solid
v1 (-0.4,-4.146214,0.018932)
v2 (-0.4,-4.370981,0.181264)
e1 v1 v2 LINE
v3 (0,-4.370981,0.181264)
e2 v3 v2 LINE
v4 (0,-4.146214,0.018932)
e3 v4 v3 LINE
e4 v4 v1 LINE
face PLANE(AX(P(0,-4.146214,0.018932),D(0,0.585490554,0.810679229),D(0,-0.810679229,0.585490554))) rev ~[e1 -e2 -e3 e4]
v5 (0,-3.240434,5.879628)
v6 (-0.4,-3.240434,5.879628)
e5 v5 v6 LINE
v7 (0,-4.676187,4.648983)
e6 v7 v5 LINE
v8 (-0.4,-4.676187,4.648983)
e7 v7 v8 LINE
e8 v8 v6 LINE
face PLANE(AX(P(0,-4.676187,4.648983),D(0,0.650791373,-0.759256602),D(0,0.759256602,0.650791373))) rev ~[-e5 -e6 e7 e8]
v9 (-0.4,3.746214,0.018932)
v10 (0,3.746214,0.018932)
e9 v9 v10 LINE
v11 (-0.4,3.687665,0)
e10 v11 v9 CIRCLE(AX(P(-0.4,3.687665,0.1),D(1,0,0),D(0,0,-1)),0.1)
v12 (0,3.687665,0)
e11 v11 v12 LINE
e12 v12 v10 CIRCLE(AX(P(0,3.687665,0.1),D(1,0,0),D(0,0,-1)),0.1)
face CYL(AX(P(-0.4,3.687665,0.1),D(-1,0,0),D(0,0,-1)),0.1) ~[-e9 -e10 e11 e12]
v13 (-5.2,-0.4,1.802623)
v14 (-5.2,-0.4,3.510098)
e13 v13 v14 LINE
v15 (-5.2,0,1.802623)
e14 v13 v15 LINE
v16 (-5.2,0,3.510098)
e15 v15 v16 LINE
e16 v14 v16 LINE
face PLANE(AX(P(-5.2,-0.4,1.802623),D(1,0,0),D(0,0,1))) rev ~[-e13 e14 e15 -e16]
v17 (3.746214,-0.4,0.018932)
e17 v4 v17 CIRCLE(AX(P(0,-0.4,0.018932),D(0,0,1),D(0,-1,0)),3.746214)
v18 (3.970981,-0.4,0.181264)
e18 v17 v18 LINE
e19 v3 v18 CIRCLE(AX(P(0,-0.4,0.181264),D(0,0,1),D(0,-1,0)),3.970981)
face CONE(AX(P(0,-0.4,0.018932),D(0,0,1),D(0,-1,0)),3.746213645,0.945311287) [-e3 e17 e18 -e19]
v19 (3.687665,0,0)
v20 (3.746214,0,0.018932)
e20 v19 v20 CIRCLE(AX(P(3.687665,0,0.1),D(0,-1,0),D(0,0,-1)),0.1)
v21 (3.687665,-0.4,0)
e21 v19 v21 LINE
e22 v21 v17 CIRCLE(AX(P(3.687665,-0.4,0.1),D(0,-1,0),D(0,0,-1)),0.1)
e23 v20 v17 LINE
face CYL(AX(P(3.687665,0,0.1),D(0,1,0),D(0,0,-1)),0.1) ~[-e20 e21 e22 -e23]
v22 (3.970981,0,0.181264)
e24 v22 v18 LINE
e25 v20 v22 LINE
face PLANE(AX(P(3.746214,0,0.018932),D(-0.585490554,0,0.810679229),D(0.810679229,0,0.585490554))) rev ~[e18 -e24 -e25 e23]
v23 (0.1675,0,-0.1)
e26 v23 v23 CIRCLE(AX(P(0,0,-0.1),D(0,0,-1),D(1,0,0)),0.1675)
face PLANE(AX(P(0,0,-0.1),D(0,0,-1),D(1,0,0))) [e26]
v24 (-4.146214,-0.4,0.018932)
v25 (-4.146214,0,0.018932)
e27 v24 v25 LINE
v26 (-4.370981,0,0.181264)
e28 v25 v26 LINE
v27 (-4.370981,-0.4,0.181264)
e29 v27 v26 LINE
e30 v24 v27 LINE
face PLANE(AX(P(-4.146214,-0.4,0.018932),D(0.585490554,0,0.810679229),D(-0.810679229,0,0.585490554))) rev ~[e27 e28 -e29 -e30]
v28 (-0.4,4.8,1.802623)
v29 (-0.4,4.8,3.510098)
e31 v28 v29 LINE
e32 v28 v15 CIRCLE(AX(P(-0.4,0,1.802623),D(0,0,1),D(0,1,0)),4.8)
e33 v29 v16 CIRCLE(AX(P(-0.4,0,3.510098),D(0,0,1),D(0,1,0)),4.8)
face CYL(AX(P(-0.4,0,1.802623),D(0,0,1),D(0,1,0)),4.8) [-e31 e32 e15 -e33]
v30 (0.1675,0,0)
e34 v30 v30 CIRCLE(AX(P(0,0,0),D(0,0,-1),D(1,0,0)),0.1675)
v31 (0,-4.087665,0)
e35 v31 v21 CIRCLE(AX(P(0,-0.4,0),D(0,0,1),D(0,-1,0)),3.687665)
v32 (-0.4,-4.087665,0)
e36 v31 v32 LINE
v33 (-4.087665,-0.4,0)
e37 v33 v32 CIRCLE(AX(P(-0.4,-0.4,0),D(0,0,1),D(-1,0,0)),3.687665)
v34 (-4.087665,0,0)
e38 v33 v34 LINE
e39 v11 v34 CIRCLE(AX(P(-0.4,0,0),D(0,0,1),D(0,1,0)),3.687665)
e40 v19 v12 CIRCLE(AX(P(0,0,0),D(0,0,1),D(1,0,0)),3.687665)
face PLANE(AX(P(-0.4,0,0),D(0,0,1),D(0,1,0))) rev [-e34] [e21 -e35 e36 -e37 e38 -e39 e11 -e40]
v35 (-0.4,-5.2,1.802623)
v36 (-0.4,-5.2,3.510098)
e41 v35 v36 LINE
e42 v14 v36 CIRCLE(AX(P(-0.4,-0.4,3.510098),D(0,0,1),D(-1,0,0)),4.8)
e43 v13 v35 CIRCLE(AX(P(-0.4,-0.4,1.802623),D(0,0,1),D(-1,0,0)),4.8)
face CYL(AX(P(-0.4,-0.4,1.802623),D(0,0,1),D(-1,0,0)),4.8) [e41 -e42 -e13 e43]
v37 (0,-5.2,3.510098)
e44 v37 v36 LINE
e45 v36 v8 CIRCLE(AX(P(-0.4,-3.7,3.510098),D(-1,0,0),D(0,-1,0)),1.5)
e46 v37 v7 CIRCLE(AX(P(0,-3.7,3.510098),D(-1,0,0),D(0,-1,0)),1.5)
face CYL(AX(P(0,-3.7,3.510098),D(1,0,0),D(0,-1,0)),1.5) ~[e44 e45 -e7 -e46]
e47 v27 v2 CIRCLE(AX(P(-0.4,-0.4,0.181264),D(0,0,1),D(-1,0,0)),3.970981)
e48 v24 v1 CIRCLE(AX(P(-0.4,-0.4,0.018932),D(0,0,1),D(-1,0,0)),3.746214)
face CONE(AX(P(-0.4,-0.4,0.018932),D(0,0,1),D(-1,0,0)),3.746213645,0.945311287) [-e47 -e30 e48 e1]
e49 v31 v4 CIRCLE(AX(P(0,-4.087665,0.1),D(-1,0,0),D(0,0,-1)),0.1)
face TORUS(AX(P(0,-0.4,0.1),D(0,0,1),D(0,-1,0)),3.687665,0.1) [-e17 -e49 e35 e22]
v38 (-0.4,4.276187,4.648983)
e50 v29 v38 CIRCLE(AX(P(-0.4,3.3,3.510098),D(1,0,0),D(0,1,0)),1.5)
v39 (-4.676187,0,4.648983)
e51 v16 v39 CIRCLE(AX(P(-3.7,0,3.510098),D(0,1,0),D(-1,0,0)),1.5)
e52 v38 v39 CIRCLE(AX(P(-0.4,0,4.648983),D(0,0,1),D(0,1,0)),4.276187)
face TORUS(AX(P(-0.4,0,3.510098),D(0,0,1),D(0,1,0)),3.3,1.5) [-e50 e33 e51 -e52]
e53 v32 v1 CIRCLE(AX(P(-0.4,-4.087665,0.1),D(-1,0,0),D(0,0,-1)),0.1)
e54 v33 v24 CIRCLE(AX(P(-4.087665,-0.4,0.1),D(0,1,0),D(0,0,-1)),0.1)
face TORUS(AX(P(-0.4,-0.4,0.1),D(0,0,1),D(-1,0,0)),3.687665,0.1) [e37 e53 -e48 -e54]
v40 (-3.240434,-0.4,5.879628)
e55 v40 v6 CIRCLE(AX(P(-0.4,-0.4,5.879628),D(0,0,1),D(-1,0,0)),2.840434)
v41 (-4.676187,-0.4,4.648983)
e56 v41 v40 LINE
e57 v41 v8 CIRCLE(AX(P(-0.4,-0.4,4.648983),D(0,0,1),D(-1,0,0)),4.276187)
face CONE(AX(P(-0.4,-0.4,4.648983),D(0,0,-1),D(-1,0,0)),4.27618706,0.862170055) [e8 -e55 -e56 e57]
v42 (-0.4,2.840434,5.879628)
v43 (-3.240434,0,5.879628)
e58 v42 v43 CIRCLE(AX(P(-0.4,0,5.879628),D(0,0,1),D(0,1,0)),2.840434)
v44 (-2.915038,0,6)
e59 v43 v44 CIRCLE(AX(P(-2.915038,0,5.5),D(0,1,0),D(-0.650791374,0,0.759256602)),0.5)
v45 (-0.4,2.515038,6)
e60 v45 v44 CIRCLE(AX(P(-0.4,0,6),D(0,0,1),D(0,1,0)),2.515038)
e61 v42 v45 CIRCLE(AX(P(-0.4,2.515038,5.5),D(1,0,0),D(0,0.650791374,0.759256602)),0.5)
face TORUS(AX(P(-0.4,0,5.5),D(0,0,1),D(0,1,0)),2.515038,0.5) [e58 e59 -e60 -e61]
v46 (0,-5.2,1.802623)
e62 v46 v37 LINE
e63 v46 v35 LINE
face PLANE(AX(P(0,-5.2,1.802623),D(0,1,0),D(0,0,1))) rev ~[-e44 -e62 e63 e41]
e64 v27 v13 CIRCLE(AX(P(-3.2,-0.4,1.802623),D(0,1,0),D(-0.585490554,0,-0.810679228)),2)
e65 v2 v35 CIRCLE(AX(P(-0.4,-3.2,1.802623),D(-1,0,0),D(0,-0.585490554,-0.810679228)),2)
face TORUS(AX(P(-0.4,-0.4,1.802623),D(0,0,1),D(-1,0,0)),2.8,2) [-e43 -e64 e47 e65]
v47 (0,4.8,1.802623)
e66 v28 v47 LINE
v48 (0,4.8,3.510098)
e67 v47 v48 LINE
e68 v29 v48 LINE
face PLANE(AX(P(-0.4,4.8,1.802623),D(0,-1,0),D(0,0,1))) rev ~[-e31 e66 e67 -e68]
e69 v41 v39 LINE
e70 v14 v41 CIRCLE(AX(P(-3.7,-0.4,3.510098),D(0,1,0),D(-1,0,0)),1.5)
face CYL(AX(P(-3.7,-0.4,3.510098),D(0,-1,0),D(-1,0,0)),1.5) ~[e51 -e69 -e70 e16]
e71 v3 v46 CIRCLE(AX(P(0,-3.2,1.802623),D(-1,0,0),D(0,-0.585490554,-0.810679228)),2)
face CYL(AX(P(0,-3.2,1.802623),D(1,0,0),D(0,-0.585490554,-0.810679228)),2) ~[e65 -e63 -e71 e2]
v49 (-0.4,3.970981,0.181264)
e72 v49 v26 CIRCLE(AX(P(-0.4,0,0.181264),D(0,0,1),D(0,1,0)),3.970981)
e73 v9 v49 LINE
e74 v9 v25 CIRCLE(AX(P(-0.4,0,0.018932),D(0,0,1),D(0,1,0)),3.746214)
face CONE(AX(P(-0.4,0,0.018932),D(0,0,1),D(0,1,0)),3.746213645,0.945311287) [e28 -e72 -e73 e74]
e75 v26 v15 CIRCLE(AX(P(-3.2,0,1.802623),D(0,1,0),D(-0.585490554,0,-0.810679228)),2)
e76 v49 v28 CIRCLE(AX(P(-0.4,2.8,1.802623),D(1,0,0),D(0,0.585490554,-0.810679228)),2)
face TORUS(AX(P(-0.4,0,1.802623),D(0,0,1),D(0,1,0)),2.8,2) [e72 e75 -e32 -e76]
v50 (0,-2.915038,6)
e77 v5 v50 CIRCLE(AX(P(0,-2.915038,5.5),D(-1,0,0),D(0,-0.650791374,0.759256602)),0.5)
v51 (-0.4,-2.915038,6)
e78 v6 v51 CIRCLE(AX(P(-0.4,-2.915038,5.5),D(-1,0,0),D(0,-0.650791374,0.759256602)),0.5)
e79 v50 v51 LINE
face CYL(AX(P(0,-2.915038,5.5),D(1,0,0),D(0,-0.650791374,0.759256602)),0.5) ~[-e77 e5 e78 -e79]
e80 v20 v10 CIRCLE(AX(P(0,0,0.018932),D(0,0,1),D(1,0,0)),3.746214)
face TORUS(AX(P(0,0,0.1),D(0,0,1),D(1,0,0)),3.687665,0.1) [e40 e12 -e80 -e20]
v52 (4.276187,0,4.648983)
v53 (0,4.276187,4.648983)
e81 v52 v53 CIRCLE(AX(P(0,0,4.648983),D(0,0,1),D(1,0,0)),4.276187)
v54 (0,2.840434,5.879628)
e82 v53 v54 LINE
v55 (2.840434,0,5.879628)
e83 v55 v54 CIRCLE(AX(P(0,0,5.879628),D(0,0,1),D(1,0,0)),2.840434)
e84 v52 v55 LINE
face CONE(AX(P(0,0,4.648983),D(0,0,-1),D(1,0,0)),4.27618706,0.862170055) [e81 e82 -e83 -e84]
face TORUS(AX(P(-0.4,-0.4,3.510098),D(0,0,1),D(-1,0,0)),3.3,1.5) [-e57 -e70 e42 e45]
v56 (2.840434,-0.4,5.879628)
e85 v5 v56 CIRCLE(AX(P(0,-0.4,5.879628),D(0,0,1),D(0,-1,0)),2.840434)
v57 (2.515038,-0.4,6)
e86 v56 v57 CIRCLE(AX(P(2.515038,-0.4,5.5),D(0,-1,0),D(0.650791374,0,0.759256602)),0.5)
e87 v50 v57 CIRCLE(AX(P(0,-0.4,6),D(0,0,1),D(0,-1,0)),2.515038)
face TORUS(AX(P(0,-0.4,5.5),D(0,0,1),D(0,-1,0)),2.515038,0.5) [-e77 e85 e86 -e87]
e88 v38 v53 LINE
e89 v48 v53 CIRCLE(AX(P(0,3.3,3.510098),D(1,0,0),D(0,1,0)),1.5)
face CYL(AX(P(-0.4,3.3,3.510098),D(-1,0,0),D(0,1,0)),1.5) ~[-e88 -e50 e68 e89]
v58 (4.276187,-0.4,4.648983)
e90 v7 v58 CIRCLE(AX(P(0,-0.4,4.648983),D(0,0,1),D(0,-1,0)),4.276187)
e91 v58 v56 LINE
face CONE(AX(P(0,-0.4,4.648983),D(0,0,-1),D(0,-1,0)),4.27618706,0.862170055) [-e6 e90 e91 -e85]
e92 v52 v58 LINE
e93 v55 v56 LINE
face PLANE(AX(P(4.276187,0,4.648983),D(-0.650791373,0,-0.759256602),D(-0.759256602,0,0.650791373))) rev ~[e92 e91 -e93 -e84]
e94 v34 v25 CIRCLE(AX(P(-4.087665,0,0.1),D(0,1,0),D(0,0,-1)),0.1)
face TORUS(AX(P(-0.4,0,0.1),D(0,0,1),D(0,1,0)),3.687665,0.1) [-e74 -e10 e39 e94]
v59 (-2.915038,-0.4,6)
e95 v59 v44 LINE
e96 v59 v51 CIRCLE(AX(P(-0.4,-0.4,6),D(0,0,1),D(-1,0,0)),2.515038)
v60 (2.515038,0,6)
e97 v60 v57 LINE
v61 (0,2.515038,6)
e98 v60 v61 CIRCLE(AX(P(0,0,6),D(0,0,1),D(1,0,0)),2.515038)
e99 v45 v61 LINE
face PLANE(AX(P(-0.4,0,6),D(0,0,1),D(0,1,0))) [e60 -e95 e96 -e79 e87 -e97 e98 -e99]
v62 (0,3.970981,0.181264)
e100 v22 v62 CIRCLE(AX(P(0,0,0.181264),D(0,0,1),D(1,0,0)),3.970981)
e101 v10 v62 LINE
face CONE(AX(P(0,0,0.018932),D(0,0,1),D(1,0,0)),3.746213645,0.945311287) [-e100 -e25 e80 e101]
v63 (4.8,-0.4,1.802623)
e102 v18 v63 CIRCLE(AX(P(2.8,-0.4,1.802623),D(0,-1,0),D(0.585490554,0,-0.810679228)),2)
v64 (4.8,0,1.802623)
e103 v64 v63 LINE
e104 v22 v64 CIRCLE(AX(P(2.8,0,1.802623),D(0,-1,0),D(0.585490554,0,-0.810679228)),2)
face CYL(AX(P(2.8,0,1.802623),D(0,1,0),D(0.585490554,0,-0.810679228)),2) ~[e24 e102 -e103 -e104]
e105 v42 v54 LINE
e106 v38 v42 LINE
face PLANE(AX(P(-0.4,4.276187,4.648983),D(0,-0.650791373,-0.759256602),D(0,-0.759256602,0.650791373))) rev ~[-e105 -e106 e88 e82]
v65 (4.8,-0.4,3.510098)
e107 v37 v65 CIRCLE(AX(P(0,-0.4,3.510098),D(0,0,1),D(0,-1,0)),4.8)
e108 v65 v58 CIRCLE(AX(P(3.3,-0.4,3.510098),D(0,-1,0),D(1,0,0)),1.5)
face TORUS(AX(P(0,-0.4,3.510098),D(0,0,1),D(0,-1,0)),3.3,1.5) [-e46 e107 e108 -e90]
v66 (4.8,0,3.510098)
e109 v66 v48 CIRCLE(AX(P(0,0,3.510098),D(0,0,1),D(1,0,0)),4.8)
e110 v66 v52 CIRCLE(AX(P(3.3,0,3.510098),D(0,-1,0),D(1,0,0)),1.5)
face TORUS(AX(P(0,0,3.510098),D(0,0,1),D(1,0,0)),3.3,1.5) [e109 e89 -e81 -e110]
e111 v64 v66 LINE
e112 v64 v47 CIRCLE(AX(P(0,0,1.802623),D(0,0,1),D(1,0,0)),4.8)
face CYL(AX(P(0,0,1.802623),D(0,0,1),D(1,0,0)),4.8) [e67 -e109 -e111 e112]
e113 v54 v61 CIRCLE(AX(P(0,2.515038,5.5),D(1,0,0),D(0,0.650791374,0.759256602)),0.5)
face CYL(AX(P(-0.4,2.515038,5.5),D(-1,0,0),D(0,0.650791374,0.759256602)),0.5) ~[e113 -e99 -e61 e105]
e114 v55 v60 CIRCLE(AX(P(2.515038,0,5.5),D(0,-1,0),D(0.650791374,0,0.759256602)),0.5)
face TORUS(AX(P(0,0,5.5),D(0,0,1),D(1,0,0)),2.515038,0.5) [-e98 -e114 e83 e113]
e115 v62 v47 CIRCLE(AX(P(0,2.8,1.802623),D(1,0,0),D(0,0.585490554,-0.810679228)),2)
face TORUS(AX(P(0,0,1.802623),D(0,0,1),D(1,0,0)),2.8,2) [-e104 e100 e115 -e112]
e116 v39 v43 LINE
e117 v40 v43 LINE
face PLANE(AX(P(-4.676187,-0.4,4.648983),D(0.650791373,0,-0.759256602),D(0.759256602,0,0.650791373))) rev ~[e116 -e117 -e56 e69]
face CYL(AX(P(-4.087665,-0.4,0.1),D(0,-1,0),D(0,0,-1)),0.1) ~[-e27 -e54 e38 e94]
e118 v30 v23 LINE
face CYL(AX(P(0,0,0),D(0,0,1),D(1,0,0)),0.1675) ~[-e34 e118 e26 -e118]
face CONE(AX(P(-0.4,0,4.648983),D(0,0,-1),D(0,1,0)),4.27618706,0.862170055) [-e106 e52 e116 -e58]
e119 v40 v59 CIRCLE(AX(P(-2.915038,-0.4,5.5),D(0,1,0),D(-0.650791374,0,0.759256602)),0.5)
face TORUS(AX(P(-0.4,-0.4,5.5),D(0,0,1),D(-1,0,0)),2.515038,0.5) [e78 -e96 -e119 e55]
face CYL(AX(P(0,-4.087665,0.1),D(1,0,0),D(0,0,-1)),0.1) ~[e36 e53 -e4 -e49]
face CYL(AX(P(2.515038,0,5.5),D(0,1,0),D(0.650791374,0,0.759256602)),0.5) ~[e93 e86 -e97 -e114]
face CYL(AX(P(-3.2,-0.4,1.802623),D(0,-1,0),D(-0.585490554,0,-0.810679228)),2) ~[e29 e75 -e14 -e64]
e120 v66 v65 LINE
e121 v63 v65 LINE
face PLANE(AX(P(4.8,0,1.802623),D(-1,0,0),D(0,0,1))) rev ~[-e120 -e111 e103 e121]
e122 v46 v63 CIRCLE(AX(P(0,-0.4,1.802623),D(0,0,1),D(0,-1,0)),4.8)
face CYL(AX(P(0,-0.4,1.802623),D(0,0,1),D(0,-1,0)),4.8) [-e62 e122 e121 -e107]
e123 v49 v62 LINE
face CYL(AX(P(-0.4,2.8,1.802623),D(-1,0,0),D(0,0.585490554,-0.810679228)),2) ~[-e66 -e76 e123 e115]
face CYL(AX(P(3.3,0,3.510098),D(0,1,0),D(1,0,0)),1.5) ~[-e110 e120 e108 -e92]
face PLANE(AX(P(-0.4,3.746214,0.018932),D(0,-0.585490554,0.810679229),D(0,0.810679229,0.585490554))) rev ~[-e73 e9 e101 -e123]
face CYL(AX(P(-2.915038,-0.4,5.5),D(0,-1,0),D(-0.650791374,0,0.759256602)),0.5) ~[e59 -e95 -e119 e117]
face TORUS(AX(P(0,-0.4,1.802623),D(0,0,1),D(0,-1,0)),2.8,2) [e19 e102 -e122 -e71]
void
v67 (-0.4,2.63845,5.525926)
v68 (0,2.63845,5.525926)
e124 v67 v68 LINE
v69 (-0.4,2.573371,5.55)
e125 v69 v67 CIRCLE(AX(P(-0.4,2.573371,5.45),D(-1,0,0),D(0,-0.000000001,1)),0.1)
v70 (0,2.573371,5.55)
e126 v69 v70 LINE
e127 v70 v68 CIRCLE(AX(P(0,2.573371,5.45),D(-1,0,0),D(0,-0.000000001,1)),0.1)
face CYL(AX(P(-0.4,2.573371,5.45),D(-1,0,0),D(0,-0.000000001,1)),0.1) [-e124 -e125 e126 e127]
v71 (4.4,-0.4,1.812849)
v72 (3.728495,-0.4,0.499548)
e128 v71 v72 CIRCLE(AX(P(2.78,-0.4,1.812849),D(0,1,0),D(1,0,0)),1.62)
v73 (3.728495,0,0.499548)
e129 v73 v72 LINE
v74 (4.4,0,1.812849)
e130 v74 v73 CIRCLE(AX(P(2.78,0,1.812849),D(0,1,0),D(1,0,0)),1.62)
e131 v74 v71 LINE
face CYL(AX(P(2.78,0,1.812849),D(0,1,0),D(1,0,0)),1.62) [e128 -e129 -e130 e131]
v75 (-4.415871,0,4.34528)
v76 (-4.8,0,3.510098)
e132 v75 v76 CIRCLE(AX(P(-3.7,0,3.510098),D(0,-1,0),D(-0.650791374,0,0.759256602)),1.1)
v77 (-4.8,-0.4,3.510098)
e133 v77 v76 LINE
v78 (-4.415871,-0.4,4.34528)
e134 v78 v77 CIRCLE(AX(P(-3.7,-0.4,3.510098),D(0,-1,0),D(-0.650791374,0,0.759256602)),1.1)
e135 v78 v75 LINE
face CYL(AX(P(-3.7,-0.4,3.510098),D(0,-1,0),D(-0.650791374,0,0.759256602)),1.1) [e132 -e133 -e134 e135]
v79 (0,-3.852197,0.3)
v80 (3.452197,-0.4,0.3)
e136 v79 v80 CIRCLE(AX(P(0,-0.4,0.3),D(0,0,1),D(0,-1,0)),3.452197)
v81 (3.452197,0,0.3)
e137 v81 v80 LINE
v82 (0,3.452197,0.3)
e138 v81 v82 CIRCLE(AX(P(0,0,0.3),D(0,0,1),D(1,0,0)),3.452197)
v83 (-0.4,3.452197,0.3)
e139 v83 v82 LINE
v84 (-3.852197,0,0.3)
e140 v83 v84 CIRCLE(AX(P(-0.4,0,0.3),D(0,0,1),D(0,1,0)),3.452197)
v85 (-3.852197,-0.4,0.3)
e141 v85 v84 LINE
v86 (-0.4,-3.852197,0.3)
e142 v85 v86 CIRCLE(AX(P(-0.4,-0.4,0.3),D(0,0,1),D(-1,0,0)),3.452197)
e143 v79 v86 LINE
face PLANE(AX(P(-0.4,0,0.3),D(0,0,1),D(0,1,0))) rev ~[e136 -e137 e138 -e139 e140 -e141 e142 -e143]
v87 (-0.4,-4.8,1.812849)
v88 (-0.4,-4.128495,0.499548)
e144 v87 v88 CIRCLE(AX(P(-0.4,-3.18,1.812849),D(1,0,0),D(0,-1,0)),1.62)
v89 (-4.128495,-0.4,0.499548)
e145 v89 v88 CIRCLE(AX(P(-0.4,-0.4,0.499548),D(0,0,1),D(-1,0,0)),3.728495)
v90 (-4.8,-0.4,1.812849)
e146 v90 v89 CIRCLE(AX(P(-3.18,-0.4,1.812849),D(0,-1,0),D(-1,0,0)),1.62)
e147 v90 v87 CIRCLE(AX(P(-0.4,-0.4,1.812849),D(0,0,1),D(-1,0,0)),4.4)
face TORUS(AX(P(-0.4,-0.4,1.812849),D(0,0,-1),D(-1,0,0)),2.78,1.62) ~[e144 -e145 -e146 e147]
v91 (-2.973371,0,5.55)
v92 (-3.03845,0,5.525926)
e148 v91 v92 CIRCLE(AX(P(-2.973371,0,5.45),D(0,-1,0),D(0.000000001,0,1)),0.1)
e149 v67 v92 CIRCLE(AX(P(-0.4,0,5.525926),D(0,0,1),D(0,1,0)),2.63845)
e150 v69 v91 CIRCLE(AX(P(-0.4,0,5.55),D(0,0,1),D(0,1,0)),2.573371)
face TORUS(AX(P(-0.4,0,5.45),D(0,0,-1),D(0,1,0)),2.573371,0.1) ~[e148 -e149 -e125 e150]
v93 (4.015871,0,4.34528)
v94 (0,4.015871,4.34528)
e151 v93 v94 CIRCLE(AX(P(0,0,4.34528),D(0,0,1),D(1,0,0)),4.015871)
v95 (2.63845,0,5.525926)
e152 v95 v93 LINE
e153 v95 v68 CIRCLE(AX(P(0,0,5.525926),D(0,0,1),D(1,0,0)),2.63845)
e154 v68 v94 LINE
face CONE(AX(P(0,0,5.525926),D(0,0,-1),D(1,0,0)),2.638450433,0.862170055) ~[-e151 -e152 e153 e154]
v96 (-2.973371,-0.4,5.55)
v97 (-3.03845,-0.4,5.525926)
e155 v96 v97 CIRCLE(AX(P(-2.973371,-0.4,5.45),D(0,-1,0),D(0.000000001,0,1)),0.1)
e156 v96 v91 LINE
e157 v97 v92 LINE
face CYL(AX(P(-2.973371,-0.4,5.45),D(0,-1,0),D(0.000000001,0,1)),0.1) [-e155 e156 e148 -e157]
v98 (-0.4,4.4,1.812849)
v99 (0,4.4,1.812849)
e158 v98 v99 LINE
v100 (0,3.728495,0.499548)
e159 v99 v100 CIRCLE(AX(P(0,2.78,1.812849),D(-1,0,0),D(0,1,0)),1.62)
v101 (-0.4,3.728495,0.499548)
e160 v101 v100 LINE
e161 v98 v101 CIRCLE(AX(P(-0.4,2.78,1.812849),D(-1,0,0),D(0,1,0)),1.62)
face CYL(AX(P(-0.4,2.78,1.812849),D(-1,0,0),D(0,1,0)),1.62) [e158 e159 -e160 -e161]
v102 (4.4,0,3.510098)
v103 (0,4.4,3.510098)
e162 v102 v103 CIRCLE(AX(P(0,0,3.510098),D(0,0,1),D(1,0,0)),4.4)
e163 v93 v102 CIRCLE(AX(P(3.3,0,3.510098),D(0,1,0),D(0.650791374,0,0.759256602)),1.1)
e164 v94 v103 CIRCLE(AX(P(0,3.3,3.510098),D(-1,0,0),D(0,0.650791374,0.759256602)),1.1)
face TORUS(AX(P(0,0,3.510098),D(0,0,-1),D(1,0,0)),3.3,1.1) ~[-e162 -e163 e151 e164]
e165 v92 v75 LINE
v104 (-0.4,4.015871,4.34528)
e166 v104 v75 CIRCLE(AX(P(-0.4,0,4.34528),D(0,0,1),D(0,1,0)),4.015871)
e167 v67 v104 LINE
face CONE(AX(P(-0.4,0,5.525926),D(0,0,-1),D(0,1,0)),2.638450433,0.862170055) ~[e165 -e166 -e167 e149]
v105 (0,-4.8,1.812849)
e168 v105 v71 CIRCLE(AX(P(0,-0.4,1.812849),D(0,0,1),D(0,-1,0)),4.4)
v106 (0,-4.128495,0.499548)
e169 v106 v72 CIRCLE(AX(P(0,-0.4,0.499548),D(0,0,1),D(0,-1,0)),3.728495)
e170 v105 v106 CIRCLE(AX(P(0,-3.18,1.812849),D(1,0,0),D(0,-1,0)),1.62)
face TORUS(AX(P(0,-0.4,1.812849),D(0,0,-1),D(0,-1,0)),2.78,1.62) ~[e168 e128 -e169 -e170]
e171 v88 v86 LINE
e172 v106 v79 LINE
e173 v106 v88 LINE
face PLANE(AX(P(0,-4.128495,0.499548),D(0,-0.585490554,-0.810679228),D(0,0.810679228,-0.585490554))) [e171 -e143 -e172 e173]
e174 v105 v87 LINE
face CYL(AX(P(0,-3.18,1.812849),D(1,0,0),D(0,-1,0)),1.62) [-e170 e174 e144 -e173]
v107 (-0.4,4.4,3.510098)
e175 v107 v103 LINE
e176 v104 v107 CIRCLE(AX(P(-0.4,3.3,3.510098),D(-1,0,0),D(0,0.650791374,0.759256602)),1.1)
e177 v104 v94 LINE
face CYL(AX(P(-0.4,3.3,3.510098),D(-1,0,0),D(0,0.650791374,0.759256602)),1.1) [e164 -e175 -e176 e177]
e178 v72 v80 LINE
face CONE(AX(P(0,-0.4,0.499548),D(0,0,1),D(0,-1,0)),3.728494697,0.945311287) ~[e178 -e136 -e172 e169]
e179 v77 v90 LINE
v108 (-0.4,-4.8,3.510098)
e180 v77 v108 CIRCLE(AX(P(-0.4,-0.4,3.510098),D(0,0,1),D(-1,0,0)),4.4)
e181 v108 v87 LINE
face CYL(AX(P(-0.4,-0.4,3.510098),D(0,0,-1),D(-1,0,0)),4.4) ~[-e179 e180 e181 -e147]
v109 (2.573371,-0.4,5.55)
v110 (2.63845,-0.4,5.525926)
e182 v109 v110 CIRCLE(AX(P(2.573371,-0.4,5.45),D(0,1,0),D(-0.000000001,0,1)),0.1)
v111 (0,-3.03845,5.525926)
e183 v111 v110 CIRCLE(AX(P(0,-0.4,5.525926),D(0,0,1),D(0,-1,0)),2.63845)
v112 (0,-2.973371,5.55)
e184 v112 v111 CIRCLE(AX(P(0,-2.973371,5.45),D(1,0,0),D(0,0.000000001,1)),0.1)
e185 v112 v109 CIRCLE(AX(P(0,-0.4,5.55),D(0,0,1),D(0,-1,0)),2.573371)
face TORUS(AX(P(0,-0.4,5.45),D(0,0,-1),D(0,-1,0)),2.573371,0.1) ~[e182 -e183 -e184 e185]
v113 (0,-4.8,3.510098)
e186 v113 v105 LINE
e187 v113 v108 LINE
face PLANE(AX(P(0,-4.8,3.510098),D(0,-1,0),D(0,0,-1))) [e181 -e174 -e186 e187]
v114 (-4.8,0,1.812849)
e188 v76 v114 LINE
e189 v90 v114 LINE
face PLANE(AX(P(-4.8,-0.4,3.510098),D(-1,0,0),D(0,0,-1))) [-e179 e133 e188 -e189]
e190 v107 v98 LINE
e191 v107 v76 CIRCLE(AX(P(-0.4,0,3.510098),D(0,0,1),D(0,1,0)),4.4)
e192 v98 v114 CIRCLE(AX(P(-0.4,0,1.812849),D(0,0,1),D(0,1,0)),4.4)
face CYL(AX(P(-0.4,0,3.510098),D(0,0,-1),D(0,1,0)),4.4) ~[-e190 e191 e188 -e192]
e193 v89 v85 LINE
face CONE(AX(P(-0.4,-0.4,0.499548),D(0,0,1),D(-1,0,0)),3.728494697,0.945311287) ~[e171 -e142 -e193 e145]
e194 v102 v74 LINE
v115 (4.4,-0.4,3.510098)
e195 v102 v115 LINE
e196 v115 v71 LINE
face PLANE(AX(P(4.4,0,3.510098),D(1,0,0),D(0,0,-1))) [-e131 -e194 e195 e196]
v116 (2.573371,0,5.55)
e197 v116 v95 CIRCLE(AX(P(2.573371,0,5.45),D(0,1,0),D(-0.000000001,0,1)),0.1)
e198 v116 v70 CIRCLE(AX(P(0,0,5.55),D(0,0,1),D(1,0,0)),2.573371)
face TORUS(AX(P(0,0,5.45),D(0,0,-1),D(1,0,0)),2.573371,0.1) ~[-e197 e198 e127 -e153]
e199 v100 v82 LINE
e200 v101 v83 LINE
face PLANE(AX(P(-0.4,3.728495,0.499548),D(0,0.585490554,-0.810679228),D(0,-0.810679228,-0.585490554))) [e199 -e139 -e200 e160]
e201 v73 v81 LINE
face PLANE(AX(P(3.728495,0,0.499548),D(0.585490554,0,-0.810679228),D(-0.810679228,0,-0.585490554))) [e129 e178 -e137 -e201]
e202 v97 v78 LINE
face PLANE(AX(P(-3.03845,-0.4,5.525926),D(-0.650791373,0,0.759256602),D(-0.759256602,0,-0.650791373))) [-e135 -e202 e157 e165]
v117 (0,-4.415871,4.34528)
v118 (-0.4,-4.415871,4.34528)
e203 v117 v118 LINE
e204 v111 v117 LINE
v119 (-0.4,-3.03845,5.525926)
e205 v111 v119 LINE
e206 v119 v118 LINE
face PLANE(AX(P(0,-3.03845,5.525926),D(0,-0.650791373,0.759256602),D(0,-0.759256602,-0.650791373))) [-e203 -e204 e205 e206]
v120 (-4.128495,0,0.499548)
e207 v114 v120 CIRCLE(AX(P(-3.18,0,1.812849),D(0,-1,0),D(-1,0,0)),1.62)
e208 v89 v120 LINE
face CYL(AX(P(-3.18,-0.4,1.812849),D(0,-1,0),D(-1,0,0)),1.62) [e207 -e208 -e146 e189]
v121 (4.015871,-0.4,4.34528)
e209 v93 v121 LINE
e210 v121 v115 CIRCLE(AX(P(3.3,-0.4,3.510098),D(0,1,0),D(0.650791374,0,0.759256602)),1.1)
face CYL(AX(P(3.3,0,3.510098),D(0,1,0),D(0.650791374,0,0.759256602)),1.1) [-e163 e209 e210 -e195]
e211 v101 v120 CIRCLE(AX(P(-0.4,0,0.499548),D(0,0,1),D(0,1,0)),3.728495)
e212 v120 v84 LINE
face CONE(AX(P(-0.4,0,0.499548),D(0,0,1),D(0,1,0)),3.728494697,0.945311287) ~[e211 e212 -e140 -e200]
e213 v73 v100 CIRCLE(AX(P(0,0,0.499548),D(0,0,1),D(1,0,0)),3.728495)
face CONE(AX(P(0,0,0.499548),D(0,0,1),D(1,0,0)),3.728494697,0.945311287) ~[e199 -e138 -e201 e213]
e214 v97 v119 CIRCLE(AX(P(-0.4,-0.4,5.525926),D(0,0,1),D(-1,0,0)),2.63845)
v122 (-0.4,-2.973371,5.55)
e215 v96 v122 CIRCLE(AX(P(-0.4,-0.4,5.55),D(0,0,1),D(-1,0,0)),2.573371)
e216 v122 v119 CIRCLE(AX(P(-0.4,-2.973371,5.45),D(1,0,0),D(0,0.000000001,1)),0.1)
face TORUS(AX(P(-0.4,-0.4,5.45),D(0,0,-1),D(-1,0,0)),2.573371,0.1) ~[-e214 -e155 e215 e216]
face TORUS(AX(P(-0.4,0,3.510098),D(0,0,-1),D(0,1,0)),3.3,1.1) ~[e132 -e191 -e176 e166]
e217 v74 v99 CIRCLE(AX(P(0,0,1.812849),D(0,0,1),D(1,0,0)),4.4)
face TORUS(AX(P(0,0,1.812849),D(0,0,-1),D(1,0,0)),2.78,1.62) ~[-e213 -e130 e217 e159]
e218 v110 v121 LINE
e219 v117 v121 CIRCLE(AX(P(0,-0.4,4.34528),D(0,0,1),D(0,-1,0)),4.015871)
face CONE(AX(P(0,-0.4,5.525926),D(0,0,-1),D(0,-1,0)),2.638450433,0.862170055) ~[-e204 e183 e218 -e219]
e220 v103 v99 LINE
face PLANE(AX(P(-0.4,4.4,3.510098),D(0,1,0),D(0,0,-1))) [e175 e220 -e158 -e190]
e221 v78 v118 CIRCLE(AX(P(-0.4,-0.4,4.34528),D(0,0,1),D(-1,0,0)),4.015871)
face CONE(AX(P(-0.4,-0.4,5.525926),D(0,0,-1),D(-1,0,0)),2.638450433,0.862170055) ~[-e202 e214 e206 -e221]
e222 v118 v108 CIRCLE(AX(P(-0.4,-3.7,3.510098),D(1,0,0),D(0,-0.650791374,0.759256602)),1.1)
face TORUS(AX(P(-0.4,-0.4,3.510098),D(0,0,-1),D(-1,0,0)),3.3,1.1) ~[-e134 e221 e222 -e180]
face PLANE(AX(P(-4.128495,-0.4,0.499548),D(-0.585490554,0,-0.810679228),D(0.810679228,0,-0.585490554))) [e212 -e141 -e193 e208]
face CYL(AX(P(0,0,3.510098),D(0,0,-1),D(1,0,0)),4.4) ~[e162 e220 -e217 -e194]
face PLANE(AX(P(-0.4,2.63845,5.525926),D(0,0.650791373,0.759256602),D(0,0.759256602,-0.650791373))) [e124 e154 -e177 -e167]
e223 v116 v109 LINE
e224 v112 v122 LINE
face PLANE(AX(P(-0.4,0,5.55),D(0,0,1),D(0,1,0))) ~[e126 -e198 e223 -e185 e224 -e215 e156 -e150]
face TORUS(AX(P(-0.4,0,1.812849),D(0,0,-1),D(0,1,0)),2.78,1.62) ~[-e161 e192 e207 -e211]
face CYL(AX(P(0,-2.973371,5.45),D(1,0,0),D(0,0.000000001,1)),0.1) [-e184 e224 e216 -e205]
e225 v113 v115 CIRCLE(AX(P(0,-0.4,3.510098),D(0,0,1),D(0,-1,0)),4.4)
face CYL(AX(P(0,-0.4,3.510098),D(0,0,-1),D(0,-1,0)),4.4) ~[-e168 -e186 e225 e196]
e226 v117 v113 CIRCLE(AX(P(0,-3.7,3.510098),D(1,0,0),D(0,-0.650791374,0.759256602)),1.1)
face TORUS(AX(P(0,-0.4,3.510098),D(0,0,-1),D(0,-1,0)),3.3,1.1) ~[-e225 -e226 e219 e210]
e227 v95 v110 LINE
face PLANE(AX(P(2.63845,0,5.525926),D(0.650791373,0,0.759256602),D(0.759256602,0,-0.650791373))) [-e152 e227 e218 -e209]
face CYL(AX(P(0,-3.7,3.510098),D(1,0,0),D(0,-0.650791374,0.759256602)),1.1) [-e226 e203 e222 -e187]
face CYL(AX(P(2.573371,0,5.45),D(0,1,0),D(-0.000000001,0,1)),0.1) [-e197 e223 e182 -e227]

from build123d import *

# Parameters (mm, degrees)
F3_DEPTH  = 0.4
F4_DEPTH  = 0.65
F5_ANGLE  = 90
F9_ANGLE  = -90
F11_ANGLE = 180
F13_DEPTH = 0.6
F14_R     = 0.1675
F17_DEPTH = 0.1


# Not quite as in the source:
# - a feature of the source that left no trace in its solid (it failed there, or was rolled back) is left out


with BuildPart() as f3:
    # F2 (on Front) → F3 (new body)
    with BuildSketch(Plane.XZ):
        with BuildLine():
            Line((0, 0.3), (0, 0))
            Line((0, 0), (3.6876645899, 0))
            ThreePointArc((3.6876645899, 0), (3.7184315179, 0.004850664), (3.7462136453, 0.0189320772))
            Line((3.7462136453, 0.0189320772), (3.9709811077, 0.1812641333))
            ThreePointArc((3.9709811077, 0.1812641333), (4.5807248826, 0.8921178442), (4.8, 1.8026225901))
            Line((4.8, 1.8026225901), (4.8, 3.5100976163))
            ThreePointArc((4.8, 3.5100976163), (4.6627693477, 4.1368828306), (4.2761870602, 4.6489825198))
            Line((4.2761870602, 4.6489825198), (2.8404336486, 5.8796283012))
            ThreePointArc((2.8404336486, 5.8796283012), (2.6885110858, 5.9689425075), (2.5150379619, 6))
            Line((2.5150379619, 6), (0, 6))
            Line((0, 6), (0, 5.55))
            Line((0, 5.55), (2.5733712952, 5.55))
            ThreePointArc((2.5733712952, 5.55), (2.60806592, 5.5437885015), (2.6384504326, 5.5259256602))
            Line((2.6384504326, 5.5259256602), (4.0158705108, 4.3452798789))
            ThreePointArc((4.0158705108, 4.3452798789), (4.2993641883, 3.9697401068), (4.4, 3.5100976163))
            Line((4.4, 3.5100976163), (4.4, 1.812848816))
            ThreePointArc((4.4, 1.812848816), (4.2223871549, 1.0753399719), (3.7284946972, 0.499548466))
            Line((3.7284946972, 0.499548466), (3.4521968212, 0.3))
            Line((3.4521968212, 0.3), (0, 0.3))
        make_face()
    extrude(amount=F3_DEPTH)

    # F4 (add): a face of the model
    f4_faces = [f3.faces().sort_by_distance(p)[0] for p in [
        (0, -0.2, 5.775),
    ]]
    extrude(f4_faces, amount=F4_DEPTH)

    # F2 (on Front) → F5 (revolve)
    with BuildSketch(Plane.XZ):
        with BuildLine():
            Line((0, 0.3), (0, 0))
            Line((0, 0), (3.6876645899, 0))
            ThreePointArc((3.6876645899, 0), (3.7184315179, 0.004850664), (3.7462136453, 0.0189320772))
            Line((3.7462136453, 0.0189320772), (3.9709811077, 0.1812641333))
            ThreePointArc((3.9709811077, 0.1812641333), (4.5807248826, 0.8921178442), (4.8, 1.8026225901))
            Line((4.8, 1.8026225901), (4.8, 3.5100976163))
            ThreePointArc((4.8, 3.5100976163), (4.6627693477, 4.1368828306), (4.2761870602, 4.6489825198))
            Line((4.2761870602, 4.6489825198), (2.8404336486, 5.8796283012))
            ThreePointArc((2.8404336486, 5.8796283012), (2.6885110858, 5.9689425075), (2.5150379619, 6))
            Line((2.5150379619, 6), (0, 6))
            Line((0, 6), (0, 5.55))
            Line((0, 5.55), (2.5733712952, 5.55))
            ThreePointArc((2.5733712952, 5.55), (2.60806592, 5.5437885015), (2.6384504326, 5.5259256602))
            Line((2.6384504326, 5.5259256602), (4.0158705108, 4.3452798789))
            ThreePointArc((4.0158705108, 4.3452798789), (4.2993641883, 3.9697401068), (4.4, 3.5100976163))
            Line((4.4, 3.5100976163), (4.4, 1.812848816))
            ThreePointArc((4.4, 1.812848816), (4.2223871549, 1.0753399719), (3.7284946972, 0.499548466))
            Line((3.7284946972, 0.499548466), (3.4521968212, 0.3))
            Line((3.4521968212, 0.3), (0, 0.3))
        make_face()
    revolve(axis=Axis((0, 0, 5.775), (0, 0, 1)), revolution_arc=F5_ANGLE)


with BuildPart() as f9_1:
    # F9: copy of F3
    add(f3.part.rotate(Axis((-0.2, -0.2, 0.1248804607), (0, 0, 1)), F9_ANGLE))


with BuildPart() as f3_1:
    add(f3.part)

    # F10: union F9_1
    add(f9_1.part)


with BuildPart() as f11_1:
    # F11: copy of F3
    add(f3_1.part.rotate(Axis((-0.2, -0.2, 0.1248804607), (0, 0, 1)), F11_ANGLE))


with BuildPart() as f3_2:
    add(f3_1.part)

    # F12: union F11_1
    add(f11_1.part)

    # F13 (add): a face of the model
    f13_faces = [f3_2.faces().sort_by_distance(p)[0] for p in [
        (-0.2, 0, 0.15),
    ]]
    extrude(f13_faces, amount=F13_DEPTH)

    # F14 (on face) → F17 (join)
    with BuildSketch(Plane(origin=(0, 0, 0), x_dir=(1, 0, 0), z_dir=(0, 0, -1))):
        Circle(F14_R)
    extrude(amount=F17_DEPTH)


solid = f3_2.part
